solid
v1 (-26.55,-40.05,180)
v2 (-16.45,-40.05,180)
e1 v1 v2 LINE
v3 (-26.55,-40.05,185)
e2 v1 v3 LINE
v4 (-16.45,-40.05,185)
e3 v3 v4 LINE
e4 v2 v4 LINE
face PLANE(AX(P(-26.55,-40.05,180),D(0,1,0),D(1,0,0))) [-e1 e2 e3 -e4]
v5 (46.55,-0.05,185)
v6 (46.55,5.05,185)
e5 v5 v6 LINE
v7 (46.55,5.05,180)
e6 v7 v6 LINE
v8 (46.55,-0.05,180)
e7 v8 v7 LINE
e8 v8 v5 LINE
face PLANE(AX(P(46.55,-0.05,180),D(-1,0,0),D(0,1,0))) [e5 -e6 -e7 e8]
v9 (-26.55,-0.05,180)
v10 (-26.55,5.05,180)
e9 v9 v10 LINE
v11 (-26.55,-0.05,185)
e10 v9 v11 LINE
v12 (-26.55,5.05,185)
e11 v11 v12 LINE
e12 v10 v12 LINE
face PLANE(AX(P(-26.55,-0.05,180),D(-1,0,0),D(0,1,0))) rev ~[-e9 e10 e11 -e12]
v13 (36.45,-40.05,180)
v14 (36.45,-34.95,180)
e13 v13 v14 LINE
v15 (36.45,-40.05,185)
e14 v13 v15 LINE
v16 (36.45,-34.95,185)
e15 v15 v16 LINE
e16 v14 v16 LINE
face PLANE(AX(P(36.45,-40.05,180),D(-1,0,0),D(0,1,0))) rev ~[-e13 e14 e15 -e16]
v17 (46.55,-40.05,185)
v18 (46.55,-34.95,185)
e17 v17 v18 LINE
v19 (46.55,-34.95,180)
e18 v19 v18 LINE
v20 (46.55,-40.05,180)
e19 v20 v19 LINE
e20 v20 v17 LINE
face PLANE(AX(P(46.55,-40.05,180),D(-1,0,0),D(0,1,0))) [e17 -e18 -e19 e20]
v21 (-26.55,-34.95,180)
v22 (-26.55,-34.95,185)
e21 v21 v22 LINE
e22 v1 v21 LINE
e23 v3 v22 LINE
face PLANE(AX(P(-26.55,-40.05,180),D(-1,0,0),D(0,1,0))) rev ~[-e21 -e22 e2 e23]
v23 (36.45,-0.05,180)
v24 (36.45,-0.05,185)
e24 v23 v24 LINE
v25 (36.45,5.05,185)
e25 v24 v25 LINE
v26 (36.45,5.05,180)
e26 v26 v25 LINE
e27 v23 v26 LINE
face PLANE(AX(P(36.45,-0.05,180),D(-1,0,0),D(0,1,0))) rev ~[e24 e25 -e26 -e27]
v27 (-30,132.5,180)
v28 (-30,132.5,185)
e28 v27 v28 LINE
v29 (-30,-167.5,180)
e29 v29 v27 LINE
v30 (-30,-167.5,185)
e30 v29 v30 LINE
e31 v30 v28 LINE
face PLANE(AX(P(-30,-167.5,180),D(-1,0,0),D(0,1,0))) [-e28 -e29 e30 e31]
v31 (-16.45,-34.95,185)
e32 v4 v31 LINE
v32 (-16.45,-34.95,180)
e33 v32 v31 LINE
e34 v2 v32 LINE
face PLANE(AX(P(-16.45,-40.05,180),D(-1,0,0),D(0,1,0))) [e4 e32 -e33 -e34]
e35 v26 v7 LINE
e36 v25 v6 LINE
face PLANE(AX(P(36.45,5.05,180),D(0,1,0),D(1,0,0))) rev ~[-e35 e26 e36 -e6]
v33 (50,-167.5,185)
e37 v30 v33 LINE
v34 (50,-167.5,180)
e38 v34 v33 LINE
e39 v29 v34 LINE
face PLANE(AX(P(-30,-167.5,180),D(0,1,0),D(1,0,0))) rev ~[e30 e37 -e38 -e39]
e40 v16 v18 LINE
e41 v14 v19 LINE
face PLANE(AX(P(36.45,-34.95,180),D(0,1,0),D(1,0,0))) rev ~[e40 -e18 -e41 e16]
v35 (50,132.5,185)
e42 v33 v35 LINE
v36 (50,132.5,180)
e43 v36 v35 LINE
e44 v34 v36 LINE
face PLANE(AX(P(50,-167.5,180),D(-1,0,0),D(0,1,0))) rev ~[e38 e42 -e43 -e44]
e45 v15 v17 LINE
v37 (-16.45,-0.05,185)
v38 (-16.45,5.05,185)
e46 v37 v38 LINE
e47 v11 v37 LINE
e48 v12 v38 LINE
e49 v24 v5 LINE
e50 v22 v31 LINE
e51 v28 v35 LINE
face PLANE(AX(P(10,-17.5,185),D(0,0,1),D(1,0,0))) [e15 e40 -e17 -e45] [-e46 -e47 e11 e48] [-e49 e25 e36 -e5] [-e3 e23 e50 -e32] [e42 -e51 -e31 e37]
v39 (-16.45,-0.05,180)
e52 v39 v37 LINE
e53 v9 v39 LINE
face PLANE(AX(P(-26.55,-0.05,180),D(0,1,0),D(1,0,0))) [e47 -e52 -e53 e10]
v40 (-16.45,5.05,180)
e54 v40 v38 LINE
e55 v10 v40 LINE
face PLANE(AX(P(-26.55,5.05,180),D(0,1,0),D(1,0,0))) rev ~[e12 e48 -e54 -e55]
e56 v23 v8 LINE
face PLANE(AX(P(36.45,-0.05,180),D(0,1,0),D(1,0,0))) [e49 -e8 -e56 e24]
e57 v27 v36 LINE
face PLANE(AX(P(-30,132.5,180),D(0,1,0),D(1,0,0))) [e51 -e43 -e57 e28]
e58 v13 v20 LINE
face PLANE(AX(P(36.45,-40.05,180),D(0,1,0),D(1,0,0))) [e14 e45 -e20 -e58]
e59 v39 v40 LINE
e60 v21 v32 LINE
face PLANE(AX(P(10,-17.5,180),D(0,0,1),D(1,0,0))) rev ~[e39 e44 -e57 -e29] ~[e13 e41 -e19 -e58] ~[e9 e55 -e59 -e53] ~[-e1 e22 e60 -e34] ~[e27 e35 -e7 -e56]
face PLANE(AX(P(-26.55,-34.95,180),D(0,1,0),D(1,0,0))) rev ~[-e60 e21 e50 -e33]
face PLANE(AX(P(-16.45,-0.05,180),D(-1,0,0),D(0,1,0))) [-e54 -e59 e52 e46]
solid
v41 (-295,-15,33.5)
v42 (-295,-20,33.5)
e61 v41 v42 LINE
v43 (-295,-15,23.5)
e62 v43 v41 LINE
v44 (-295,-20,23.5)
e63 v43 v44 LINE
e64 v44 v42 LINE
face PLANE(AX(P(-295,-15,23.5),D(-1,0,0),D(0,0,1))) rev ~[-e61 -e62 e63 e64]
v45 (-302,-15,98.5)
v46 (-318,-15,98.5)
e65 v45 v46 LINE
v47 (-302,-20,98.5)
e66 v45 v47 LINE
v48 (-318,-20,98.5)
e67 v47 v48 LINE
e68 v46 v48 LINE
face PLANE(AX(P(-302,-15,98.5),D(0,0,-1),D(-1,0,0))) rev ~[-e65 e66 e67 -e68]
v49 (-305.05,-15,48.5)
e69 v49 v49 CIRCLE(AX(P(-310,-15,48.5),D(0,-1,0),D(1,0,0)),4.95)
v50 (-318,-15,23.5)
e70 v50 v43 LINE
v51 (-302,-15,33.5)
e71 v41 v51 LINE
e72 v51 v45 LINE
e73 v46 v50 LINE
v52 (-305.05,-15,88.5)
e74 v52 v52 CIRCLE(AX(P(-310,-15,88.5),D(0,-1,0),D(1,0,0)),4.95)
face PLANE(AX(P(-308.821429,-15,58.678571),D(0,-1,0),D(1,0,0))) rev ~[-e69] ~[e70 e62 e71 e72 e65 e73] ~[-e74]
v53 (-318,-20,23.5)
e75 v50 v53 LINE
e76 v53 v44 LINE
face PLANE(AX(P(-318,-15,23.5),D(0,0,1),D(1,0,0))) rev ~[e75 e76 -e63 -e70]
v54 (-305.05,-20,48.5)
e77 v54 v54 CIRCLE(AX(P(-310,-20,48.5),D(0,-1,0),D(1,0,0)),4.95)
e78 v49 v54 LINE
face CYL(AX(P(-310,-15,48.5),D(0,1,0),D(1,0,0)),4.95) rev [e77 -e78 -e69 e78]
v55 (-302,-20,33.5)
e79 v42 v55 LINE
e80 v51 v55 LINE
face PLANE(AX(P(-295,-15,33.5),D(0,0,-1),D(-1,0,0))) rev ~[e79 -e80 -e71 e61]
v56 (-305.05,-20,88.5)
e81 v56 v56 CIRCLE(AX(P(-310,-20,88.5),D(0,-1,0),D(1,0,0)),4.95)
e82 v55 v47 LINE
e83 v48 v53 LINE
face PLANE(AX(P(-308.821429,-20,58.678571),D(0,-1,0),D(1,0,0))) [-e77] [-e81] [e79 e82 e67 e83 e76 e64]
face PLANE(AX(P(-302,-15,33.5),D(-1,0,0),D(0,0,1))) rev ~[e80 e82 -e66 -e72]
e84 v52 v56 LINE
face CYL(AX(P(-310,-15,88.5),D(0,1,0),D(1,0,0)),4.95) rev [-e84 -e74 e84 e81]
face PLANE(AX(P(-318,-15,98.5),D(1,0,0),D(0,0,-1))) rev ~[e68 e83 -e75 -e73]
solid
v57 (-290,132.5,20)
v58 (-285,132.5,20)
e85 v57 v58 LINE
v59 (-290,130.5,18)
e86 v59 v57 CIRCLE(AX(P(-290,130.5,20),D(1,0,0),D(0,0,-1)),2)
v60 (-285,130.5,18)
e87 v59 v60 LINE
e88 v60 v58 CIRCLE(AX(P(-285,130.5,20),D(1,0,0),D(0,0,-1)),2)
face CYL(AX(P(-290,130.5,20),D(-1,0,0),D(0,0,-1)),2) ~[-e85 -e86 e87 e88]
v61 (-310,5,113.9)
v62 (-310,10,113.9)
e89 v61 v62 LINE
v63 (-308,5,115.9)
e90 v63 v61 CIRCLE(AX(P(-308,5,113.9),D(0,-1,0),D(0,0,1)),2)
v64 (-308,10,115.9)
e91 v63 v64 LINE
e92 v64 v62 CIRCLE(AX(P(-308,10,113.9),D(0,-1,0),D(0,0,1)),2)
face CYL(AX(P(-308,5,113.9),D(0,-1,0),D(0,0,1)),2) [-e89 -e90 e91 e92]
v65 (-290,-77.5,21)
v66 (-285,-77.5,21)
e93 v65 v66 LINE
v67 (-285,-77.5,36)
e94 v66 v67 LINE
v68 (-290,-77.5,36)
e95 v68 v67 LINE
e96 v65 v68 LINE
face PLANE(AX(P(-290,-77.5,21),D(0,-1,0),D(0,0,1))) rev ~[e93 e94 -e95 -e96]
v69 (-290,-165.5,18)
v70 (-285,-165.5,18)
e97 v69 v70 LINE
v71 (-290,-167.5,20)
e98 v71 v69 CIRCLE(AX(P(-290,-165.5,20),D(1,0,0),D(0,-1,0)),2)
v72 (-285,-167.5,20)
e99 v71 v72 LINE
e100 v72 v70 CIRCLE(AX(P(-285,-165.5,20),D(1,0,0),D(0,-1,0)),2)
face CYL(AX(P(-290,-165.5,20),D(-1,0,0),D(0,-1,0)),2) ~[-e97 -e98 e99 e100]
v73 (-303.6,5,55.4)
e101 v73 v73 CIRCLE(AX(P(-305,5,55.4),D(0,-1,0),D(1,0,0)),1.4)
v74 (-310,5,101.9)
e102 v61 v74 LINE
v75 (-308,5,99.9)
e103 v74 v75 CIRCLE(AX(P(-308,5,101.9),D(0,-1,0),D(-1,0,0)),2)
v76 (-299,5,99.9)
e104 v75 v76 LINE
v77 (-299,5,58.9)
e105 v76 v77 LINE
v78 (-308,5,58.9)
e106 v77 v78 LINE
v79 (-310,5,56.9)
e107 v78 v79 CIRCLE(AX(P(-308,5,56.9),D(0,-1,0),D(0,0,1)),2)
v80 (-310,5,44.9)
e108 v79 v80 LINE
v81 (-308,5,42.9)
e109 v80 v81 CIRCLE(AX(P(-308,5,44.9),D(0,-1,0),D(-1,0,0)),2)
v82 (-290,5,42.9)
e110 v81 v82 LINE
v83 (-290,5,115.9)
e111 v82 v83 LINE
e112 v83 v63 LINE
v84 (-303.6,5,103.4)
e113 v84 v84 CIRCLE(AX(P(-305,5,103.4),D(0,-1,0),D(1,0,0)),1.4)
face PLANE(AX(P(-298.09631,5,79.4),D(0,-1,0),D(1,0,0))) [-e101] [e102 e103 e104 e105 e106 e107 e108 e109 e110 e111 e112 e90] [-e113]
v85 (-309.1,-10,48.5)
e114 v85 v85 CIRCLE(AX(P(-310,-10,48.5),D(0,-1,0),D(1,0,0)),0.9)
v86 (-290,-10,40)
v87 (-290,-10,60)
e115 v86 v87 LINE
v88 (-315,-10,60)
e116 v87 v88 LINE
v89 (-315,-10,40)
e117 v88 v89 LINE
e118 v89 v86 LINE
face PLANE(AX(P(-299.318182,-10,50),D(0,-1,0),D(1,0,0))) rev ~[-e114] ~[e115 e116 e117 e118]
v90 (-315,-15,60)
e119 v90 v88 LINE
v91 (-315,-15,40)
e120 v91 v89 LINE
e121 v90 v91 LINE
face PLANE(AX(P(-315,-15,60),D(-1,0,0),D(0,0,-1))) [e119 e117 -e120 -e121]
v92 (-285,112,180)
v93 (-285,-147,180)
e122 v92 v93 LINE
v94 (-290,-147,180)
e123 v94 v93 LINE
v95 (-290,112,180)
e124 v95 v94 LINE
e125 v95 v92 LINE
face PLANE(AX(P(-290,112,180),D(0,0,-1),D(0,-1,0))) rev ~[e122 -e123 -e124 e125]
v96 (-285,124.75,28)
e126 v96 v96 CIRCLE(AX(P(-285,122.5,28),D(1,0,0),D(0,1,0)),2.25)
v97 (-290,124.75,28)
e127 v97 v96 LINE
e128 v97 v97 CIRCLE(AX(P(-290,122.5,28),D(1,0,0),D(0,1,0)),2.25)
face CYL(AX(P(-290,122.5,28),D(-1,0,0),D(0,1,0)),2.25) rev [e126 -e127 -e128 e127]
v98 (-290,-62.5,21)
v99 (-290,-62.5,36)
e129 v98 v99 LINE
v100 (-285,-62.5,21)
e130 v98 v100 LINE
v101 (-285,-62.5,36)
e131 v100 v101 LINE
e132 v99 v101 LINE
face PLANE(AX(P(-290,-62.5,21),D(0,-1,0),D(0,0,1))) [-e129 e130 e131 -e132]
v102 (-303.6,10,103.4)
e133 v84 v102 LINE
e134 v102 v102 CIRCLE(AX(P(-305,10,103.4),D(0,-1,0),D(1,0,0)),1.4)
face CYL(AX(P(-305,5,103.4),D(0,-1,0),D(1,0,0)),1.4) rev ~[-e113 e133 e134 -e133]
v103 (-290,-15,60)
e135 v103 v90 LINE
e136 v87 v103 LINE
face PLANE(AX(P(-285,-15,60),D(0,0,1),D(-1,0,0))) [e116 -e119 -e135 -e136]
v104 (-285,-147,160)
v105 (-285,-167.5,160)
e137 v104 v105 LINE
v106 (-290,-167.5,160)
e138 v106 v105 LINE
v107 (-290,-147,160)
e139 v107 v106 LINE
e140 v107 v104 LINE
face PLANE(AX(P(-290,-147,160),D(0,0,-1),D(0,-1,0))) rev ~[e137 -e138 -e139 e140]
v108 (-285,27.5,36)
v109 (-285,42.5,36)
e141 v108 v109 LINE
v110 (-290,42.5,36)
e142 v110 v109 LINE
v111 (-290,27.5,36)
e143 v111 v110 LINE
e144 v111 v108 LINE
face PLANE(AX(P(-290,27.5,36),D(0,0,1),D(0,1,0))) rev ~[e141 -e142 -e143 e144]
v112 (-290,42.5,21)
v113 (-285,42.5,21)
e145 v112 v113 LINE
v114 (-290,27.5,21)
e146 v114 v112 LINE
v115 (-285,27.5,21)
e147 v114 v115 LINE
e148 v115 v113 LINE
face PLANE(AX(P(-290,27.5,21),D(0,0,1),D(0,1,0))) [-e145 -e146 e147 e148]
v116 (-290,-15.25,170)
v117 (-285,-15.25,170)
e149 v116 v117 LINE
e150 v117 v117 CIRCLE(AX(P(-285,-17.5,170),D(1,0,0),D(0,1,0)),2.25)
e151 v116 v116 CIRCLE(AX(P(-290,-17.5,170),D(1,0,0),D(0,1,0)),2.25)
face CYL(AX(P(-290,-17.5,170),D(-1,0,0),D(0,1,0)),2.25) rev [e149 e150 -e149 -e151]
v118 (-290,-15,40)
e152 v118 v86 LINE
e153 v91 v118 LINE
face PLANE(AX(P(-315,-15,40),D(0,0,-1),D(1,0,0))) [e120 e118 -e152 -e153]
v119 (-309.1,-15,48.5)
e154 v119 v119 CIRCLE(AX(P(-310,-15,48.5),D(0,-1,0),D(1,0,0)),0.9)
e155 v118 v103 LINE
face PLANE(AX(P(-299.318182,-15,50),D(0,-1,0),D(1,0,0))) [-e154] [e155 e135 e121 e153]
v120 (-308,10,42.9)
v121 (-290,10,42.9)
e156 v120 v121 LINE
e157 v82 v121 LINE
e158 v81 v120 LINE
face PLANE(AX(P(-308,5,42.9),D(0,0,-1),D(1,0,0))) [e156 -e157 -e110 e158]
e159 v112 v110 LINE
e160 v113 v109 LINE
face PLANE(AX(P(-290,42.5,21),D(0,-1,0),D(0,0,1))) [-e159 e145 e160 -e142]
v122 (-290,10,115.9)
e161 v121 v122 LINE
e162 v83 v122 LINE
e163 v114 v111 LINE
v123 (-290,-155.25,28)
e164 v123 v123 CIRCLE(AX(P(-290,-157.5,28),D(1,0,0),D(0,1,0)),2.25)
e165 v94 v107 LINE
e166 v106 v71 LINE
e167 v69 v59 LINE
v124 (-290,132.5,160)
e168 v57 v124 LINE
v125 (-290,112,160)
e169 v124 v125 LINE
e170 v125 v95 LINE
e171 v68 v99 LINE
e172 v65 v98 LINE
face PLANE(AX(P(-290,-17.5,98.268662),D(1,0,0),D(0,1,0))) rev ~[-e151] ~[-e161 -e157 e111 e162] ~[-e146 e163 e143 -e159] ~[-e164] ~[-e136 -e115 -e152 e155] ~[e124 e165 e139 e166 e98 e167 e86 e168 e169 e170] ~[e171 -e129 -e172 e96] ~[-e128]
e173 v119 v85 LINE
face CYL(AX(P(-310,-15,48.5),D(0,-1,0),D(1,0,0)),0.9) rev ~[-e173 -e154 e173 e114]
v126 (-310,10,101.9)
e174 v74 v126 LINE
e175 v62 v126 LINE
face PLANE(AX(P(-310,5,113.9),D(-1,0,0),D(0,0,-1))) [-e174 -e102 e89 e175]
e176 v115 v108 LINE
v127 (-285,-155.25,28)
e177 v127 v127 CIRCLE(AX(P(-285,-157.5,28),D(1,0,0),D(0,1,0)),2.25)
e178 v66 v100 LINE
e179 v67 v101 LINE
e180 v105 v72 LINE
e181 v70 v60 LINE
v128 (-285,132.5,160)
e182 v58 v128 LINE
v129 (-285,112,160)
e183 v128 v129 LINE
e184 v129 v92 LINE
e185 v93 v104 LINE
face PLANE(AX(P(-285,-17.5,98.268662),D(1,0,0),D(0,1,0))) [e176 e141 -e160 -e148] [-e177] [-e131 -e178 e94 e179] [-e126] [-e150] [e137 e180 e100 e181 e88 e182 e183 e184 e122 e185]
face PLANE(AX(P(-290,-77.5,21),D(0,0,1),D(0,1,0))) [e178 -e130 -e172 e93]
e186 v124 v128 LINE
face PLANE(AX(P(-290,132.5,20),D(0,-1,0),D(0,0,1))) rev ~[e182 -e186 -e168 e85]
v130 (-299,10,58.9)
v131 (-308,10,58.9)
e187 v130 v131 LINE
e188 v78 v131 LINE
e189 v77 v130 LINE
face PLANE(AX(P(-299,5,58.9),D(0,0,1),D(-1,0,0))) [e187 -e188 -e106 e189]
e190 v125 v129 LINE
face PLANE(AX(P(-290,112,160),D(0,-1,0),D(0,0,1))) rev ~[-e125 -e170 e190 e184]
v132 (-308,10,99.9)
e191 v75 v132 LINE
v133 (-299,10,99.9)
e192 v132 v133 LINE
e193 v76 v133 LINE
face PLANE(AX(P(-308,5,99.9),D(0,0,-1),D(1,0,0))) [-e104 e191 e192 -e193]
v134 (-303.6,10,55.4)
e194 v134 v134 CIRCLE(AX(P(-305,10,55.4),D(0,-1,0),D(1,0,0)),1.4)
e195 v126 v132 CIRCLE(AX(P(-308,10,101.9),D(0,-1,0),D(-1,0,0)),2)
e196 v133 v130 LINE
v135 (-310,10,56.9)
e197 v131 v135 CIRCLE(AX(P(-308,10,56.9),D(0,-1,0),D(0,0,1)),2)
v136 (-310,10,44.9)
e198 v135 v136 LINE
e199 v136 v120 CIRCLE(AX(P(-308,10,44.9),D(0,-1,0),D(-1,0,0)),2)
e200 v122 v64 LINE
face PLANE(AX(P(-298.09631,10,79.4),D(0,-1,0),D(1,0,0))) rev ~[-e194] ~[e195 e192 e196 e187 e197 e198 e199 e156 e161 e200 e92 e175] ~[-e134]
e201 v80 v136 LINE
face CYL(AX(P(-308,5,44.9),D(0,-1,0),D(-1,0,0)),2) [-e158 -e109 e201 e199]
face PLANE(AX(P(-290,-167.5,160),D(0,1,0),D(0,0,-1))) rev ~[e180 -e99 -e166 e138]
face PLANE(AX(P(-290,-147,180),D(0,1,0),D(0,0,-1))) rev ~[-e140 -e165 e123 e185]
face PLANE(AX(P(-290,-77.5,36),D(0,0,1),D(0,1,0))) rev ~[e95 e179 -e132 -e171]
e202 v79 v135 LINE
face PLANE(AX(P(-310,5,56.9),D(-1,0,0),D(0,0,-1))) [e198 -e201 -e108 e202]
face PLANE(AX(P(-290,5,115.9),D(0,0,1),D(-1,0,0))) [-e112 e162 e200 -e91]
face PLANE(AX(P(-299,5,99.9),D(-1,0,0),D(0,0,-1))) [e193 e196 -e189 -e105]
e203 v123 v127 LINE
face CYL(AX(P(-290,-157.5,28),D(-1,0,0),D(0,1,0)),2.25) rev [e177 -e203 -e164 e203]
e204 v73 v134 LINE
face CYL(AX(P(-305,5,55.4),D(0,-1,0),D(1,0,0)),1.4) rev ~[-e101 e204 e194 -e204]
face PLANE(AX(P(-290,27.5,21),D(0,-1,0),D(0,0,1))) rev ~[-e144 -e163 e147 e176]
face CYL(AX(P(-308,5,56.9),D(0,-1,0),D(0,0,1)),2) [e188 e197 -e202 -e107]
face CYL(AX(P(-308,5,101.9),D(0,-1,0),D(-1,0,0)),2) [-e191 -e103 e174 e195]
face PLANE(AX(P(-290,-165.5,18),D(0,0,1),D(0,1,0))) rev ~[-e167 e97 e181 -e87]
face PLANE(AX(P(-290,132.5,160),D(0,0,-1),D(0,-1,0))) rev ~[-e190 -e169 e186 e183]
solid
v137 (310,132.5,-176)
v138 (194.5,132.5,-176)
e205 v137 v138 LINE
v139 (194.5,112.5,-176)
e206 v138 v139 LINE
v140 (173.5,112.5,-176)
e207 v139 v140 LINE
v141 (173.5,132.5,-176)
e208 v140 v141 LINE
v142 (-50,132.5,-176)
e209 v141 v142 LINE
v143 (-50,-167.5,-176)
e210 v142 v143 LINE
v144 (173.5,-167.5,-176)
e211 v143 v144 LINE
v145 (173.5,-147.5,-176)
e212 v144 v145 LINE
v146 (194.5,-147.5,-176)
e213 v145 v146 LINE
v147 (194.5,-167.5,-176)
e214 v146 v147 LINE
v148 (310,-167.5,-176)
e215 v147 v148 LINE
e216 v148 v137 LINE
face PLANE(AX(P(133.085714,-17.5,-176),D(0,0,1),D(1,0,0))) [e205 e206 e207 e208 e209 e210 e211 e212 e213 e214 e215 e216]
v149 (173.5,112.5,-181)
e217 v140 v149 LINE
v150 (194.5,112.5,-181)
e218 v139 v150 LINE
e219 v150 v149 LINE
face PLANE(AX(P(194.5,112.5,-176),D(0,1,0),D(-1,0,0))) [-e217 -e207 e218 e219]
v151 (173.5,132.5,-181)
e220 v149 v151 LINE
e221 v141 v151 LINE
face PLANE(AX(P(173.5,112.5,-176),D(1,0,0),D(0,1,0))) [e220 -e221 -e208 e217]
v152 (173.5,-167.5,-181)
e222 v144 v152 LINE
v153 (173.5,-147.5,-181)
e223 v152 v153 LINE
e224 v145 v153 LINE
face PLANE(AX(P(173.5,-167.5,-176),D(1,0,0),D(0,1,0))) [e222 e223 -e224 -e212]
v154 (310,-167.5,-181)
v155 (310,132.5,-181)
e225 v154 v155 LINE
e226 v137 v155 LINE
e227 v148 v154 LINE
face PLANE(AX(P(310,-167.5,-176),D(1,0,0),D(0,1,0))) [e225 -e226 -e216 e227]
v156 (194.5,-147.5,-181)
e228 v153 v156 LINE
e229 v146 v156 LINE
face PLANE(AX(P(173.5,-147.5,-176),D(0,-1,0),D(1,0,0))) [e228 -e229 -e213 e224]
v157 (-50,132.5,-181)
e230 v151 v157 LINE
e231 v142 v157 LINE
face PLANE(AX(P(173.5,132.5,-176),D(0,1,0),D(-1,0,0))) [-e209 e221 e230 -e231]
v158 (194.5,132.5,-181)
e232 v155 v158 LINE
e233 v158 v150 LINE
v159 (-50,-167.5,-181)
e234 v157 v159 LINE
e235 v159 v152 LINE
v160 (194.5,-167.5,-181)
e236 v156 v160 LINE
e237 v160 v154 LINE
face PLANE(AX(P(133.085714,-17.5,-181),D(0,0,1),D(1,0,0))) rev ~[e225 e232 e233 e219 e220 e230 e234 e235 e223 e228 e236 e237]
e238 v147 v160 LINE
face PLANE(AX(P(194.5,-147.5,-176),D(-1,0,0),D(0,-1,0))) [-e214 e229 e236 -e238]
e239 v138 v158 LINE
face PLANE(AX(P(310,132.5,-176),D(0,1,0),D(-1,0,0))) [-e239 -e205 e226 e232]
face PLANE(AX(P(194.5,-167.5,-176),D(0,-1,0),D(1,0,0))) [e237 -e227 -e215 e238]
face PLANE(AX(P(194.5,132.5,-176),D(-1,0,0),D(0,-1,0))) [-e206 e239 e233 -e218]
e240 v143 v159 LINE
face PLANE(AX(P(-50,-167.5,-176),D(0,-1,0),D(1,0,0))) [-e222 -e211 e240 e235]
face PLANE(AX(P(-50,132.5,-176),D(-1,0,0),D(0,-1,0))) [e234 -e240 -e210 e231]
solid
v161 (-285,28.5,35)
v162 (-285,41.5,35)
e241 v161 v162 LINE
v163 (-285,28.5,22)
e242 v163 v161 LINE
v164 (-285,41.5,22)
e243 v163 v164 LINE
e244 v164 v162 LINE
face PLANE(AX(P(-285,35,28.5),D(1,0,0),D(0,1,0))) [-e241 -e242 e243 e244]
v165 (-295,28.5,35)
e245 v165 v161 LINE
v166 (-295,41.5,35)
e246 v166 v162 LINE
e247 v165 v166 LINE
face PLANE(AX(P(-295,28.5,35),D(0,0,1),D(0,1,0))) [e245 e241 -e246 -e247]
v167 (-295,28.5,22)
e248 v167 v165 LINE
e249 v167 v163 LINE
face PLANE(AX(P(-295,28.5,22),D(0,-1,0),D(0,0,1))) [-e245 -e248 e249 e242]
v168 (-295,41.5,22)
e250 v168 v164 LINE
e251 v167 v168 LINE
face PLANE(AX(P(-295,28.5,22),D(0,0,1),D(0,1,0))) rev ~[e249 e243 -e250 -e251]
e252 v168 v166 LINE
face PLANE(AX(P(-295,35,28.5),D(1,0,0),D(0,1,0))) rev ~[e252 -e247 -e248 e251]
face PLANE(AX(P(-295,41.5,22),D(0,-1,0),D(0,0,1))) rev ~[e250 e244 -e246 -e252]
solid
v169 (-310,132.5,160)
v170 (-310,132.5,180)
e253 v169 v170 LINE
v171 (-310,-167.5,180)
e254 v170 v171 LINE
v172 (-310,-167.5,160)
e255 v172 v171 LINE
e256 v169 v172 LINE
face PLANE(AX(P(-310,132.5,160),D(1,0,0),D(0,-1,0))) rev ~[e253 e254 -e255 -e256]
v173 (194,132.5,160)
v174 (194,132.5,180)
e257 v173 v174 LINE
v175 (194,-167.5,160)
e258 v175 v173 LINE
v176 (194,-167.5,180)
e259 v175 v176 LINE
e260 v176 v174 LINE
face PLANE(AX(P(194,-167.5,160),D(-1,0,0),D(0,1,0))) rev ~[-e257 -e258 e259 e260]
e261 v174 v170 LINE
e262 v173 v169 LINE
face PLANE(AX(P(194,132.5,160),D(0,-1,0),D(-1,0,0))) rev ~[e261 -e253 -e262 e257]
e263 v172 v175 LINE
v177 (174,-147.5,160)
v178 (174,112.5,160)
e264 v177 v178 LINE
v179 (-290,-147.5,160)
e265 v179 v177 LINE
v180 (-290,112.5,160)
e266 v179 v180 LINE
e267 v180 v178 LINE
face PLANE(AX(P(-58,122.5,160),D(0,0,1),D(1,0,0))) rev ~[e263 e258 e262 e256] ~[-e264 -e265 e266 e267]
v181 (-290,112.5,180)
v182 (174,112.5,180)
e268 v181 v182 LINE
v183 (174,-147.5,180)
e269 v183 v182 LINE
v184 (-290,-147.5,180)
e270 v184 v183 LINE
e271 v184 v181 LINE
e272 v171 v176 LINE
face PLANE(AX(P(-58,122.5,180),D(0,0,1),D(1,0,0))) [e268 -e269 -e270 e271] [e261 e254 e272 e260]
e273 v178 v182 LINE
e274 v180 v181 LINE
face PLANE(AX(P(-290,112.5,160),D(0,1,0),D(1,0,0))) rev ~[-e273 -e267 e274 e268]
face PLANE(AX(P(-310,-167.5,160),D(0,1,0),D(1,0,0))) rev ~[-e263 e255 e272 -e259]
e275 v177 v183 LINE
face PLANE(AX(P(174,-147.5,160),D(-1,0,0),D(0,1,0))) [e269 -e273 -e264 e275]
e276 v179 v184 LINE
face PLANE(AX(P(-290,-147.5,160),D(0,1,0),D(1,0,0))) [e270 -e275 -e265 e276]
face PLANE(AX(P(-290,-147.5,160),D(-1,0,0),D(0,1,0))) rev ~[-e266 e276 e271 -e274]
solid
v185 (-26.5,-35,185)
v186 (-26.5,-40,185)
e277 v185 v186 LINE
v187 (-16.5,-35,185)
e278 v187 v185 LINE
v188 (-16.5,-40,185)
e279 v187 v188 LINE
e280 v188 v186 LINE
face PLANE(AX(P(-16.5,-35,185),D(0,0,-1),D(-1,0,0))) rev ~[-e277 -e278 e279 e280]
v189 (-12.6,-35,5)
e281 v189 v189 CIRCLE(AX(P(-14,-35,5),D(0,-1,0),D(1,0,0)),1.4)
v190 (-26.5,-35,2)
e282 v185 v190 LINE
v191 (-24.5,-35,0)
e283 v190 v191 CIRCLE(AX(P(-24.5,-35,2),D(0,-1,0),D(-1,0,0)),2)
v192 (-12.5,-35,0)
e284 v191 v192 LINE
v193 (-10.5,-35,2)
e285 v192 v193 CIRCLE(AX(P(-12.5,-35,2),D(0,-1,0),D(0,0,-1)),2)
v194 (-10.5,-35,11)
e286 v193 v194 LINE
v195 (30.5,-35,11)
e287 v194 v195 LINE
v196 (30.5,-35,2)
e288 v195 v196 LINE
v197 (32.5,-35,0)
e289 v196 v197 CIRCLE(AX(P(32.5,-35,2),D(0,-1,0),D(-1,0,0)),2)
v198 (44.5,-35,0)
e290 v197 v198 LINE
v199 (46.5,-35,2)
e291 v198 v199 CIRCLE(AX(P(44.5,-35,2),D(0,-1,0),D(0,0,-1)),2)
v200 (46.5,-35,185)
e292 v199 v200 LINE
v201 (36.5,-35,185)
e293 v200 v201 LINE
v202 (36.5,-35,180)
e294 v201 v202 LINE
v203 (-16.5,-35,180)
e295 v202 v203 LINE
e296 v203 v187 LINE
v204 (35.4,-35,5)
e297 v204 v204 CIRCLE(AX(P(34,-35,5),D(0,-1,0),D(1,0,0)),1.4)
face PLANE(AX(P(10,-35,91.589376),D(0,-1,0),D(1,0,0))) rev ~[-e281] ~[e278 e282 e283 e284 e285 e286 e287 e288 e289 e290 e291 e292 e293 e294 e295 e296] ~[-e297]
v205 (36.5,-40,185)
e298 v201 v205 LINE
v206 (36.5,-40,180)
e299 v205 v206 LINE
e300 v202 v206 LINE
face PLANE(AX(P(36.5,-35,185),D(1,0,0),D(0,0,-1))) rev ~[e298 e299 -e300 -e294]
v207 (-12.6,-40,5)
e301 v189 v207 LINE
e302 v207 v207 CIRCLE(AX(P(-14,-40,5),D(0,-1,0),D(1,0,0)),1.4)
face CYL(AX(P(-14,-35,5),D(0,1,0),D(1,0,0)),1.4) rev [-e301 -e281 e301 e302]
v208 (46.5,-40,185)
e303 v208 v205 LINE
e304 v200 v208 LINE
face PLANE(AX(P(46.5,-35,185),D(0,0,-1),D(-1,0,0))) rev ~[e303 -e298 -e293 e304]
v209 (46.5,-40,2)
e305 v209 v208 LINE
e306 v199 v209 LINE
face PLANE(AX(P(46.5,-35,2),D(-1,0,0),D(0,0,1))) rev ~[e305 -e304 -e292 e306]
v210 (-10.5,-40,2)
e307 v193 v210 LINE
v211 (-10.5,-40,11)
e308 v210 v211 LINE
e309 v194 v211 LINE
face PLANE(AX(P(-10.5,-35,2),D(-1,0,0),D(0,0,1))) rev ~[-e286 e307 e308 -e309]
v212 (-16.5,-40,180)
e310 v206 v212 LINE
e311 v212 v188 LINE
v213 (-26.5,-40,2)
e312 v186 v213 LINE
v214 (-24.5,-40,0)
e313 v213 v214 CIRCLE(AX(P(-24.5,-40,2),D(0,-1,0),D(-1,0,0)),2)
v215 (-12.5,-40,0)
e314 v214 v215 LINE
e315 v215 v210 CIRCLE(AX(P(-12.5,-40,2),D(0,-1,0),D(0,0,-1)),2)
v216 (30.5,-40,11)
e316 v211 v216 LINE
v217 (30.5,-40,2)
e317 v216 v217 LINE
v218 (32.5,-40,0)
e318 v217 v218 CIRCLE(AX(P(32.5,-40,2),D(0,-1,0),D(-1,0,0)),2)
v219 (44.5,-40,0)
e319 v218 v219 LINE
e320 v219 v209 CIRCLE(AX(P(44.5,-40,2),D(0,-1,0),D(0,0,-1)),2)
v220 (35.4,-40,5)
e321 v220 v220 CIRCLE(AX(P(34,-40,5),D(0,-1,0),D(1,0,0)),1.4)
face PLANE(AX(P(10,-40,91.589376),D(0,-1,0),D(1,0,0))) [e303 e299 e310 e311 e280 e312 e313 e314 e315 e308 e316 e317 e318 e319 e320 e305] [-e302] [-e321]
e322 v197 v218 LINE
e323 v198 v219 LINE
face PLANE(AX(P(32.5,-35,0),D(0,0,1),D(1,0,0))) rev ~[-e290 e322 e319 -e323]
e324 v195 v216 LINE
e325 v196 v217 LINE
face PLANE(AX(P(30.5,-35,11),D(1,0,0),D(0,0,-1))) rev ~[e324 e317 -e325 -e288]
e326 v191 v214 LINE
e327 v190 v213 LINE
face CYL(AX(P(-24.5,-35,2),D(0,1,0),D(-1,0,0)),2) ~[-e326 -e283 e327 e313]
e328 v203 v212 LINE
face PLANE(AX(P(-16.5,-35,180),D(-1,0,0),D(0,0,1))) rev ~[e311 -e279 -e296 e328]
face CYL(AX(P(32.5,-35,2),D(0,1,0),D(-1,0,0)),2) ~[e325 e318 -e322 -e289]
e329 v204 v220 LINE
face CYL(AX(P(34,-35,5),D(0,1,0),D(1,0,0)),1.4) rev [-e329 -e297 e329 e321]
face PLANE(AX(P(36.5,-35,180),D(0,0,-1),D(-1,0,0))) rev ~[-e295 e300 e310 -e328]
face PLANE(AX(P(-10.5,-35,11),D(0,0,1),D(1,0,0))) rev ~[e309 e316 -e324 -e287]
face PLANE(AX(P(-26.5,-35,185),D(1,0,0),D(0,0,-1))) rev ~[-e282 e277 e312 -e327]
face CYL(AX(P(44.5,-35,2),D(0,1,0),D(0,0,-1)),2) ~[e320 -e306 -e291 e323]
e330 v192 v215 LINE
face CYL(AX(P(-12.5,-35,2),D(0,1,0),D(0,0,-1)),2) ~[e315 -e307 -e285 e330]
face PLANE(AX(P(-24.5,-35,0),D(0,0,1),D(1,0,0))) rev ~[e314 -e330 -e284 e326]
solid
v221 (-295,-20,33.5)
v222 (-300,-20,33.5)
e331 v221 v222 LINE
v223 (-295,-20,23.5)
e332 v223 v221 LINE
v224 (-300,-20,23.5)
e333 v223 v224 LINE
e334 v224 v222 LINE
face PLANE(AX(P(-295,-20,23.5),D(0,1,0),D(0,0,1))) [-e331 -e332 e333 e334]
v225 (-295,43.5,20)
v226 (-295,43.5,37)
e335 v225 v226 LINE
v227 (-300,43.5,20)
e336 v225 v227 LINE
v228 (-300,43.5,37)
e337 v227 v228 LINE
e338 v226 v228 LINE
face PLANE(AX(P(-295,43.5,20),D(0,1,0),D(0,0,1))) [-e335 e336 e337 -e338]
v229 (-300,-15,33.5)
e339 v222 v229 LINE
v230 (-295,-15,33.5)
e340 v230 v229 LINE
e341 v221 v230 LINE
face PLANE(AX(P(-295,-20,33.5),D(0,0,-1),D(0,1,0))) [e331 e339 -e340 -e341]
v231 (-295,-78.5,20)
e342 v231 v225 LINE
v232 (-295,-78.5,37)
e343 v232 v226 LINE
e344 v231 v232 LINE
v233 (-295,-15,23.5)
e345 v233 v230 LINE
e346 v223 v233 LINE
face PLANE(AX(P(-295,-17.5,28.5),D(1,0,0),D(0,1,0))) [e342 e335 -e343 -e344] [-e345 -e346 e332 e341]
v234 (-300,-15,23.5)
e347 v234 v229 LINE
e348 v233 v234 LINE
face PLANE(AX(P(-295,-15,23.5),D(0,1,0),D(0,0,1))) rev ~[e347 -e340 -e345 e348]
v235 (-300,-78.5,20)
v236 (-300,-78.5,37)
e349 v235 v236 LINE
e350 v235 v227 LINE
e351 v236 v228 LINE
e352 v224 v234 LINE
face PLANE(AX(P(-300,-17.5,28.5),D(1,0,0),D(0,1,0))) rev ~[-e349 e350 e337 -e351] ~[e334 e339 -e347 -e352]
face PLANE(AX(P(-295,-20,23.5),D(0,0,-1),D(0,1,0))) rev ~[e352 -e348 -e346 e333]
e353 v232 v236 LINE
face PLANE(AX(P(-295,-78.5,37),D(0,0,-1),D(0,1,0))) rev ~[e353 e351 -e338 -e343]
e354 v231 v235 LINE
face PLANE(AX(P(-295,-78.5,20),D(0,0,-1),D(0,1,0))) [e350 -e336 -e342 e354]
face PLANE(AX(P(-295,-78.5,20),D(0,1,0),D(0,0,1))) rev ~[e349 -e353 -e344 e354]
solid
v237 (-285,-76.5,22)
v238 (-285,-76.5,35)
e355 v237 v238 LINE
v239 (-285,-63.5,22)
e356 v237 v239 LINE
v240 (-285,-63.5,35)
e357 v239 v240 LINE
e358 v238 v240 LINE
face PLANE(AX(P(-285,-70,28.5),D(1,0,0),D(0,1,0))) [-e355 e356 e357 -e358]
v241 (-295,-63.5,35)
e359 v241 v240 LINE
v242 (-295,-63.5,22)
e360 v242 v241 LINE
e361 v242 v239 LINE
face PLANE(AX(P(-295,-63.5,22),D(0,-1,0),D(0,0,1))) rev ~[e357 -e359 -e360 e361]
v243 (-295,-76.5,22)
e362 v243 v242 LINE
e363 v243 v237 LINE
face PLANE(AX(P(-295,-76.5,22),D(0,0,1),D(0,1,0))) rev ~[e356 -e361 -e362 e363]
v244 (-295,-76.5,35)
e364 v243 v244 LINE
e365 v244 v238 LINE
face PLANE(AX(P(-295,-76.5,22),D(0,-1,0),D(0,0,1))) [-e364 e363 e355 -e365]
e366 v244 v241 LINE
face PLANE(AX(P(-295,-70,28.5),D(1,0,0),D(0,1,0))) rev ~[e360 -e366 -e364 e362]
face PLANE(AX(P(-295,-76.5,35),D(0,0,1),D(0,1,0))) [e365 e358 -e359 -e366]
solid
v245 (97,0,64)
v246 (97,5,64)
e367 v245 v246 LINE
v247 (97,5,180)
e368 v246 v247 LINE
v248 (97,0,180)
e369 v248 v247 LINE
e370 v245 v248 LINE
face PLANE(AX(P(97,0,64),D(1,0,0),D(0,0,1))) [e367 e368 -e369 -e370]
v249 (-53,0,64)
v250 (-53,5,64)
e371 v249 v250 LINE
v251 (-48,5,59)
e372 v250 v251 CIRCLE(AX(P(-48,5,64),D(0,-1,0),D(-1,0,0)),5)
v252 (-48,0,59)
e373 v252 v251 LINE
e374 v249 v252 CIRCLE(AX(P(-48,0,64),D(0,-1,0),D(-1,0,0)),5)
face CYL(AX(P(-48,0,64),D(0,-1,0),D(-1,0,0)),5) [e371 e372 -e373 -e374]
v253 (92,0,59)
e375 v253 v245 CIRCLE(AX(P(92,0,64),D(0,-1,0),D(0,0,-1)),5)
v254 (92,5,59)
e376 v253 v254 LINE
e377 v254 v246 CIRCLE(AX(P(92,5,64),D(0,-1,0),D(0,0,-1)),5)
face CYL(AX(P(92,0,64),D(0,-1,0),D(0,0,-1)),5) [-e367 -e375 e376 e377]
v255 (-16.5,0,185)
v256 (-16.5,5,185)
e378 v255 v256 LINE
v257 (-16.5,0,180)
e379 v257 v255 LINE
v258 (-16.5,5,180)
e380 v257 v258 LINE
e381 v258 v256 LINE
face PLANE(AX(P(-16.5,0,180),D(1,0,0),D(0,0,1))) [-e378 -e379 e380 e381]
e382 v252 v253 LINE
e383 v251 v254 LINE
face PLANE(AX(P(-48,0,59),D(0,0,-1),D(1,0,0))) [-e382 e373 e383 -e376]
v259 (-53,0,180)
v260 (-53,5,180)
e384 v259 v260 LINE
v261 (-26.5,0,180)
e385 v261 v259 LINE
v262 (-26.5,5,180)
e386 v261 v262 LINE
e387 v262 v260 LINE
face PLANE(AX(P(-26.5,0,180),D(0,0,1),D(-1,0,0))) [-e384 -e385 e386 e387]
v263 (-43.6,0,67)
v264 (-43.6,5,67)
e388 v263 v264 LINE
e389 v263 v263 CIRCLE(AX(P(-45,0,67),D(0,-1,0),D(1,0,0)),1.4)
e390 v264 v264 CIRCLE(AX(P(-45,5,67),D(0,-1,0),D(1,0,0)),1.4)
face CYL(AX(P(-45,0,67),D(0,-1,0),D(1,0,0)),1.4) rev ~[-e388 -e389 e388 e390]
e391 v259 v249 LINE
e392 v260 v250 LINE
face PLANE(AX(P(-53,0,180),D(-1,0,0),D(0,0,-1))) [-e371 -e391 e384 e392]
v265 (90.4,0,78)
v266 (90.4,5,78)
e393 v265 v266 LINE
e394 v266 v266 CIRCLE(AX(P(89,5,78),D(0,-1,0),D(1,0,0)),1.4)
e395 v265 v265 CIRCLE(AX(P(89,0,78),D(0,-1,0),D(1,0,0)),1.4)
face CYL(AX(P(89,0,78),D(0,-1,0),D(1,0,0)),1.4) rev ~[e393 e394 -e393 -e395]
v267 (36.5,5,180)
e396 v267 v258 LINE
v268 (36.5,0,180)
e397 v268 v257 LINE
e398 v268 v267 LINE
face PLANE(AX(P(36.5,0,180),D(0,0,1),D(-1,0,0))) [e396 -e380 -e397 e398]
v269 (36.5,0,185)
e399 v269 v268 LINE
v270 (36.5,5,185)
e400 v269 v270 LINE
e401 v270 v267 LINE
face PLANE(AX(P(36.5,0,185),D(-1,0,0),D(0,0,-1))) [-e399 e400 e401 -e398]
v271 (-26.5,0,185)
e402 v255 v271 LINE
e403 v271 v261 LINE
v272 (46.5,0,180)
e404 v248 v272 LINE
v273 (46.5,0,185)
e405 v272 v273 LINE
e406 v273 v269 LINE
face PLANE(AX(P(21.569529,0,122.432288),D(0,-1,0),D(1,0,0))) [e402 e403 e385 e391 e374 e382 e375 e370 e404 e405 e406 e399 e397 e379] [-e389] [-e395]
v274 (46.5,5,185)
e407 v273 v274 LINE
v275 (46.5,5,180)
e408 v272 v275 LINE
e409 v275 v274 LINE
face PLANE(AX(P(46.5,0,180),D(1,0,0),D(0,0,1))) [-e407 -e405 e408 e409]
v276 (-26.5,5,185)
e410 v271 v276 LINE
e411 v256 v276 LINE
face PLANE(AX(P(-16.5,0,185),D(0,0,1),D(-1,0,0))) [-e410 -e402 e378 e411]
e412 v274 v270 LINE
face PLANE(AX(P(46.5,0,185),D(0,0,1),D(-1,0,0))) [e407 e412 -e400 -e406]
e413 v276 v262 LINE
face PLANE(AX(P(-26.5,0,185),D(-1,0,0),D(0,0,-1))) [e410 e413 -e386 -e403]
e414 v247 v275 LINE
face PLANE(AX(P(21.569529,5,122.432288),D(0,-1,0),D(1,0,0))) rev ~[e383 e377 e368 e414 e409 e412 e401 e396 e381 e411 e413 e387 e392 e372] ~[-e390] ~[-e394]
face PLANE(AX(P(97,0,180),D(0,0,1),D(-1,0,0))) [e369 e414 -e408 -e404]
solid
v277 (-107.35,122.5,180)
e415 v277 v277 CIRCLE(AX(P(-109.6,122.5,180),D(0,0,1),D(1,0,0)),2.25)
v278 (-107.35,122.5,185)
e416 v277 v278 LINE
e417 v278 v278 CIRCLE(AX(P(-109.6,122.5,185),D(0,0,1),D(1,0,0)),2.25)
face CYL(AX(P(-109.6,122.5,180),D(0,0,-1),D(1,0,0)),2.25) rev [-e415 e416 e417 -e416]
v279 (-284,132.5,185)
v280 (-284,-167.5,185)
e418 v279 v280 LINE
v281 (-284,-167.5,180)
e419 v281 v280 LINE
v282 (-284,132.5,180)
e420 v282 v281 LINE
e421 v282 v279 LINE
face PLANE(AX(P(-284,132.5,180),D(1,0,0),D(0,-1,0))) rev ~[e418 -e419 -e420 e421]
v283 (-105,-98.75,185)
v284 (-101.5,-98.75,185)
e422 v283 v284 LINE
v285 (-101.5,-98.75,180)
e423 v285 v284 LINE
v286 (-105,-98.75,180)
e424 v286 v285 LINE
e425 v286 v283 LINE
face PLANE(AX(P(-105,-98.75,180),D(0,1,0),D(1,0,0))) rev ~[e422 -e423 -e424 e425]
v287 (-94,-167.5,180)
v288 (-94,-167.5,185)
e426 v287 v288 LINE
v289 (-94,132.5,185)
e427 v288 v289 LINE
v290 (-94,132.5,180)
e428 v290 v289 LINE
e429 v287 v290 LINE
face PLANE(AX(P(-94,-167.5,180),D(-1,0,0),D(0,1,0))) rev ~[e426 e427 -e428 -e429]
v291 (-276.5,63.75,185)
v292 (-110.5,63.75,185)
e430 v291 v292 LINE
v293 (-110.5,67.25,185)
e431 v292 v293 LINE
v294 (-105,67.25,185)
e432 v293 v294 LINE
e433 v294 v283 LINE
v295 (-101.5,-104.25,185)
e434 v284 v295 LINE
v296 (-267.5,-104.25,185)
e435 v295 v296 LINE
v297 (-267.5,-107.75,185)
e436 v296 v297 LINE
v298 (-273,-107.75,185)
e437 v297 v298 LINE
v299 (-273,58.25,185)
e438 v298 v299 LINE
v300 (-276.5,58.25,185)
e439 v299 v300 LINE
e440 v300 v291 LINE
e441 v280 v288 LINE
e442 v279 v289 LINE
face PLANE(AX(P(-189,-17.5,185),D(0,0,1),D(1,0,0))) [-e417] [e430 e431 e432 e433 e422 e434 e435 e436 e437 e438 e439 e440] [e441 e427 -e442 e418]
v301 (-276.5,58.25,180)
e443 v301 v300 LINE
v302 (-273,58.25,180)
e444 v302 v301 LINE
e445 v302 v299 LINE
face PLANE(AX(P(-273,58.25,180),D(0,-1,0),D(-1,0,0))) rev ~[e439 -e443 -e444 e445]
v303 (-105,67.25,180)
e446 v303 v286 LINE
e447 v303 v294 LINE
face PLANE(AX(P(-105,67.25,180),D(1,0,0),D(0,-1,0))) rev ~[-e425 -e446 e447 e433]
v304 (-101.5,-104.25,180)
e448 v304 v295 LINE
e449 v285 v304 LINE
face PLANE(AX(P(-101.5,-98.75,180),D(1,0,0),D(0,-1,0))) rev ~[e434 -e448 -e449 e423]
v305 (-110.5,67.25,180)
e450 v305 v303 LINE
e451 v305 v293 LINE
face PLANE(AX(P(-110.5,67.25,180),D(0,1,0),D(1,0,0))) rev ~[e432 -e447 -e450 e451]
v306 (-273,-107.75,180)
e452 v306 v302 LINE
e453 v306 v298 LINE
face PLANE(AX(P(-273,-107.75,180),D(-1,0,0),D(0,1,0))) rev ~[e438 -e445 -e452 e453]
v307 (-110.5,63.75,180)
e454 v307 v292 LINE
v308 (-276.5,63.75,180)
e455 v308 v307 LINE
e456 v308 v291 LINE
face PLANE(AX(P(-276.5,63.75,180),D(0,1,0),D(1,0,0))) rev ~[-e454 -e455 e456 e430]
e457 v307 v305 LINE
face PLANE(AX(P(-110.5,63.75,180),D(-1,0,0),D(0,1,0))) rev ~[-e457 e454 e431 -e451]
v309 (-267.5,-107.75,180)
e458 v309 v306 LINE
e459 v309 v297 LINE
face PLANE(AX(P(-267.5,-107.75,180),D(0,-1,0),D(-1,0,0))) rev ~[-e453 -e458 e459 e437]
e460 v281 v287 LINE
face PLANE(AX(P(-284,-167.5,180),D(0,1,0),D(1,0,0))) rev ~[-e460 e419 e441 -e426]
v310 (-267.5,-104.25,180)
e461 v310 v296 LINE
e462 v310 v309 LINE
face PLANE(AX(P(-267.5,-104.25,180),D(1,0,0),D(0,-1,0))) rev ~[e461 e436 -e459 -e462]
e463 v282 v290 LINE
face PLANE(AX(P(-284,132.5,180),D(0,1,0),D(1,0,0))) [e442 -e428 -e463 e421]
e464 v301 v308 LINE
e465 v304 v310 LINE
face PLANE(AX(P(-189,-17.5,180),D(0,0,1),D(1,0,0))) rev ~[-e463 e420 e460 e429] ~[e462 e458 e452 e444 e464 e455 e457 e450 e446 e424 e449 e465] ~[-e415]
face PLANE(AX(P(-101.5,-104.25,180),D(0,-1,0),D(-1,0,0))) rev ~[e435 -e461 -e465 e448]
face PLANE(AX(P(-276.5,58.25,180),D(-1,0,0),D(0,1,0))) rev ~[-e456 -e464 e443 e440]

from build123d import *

# Parameters (mm, degrees)
F2_R      = 1.4
F3_DEPTH  = 5
F0_R      = 1.4
F4_DEPTH  = 5
F9_W      = 464
F9_H      = 20
F9_W_2    = 20
F9_H_2    = 260
F10_DEPTH = 20
F11_DEPTH = 5
F16_W     = 190
F16_H     = 260
F16_H_2   = 20
F16_R     = 2.25
F17_DEPTH = 5
F18_W     = 80
F18_H     = 300
F18_W_2   = 10.1
F18_H_2   = 5.1
F19_DEPTH = 5
F15_R     = 2.25
F15_W     = 15
F15_H     = 15
F22_DEPTH = 5
F21_W     = 13
F21_H     = 13
F23_DEPTH = 10
F24_W     = 122
F24_H     = 17
F24_W_2   = 5
F24_H_2   = 10
F25_DEPTH = 5
F27_R     = 0.9
F28_DEPTH = 5
F30_R     = 1.4
F31_DEPTH = 5
F32_R     = 4.95
F33_DEPTH = 5


# Not quite as in the source:
# - a feature of the source that left no trace in its solid (it failed there, or was rolled back) is left out
# - a feature names something its author has since deleted; it is built from what else it names


with BuildPart() as f3:
    # F2 (on offset) → F3 (new body)
    with BuildSketch(Plane.XZ.offset(35)):
        with BuildLine():
            ThreePointArc((-26.5, 2), (-25.9142135624, 0.5857864376), (-24.5, 0))
            Line((-24.5, 0), (-12.5, 0))
            ThreePointArc((-12.5, 0), (-11.0857864376, 0.5857864376), (-10.5, 2))
            Line((-10.5, 2), (-10.5, 11))
            Line((-10.5, 11), (30.5, 11))
            Line((30.5, 11), (30.5, 2))
            ThreePointArc((30.5, 2), (31.0857864376, 0.5857864376), (32.5, 0))
            Line((32.5, 0), (44.5, 0))
            ThreePointArc((44.5, 0), (45.9142135624, 0.5857864376), (46.5, 2))
            Line((46.5, 2), (46.5, 100))
            Line((46.5, 100), (46.5, 185))
            Line((46.5, 185), (36.5, 185))
            Line((36.5, 185), (36.5, 180))
            Line((36.5, 180), (-16.5, 180))
            Line((-16.5, 180), (-16.5, 185))
            Line((-16.5, 185), (-26.5, 185))
            Line((-26.5, 185), (-26.5, 180))
            Line((-26.5, 180), (-26.5, 2))
        make_face()
        with Locations((-14, 5)):
            Circle(F2_R, mode=Mode.SUBTRACT)
        with Locations((34, 5)):
            Circle(F2_R, mode=Mode.SUBTRACT)
    extrude(amount=F3_DEPTH)


with BuildPart() as f4:
    # F0 (on Front) → F4 (new body)
    with BuildSketch(Plane.XZ):
        with BuildLine():
            Line((-53, 180), (-53, 64))
            ThreePointArc((-53, 64), (-51.5355339059, 60.4644660941), (-48, 59))
            Line((-48, 59), (92, 59))
            ThreePointArc((92, 59), (95.5355339059, 60.4644660941), (97, 64))
            Line((97, 64), (97, 180))
            Line((97, 180), (46.5, 180))
            Line((46.5, 180), (46.5, 185))
            Line((46.5, 185), (36.5, 185))
            Line((36.5, 185), (36.5, 180))
            Line((36.5, 180), (-16.5, 180))
            Line((-16.5, 180), (-16.5, 185))
            Line((-16.5, 185), (-26.5, 185))
            Line((-26.5, 185), (-26.5, 180))
            Line((-26.5, 180), (-53, 180))
        make_face()
        with Locations((-45, 67)):
            Circle(F0_R, mode=Mode.SUBTRACT)
        with Locations((89, 78)):
            Circle(F0_R, mode=Mode.SUBTRACT)
    extrude(amount=-F4_DEPTH)


with BuildPart() as f10:
    # F9 (on offset) → F10 (new body)
    with BuildSketch(Plane.XY.offset(160)):
        with Locations((-58, 122.5)):
            Rectangle(F9_W, F9_H)
        with Locations((-300, -17.5)):
            Rectangle(F9_W_2, F9_H_2)
        with Locations((-300, 122.5)):
            Rectangle(F9_W_2, F9_H)
        with Locations((184, -17.5)):
            Rectangle(F9_W_2, F9_H_2)
        with Locations((184, 122.5)):
            Rectangle(F9_W_2, F9_H)
        with Locations((-300, -157.5)):
            Rectangle(F9_W_2, F9_H)
        with Locations((-58, -157.5)):
            Rectangle(F9_W, F9_H)
        with Locations((184, -157.5)):
            Rectangle(F9_W_2, F9_H)
    extrude(amount=F10_DEPTH)


with BuildPart() as f11:
    # F7 (on offset) → F11 (new body)
    with BuildSketch(Plane.XY.offset(-176)):
        Polygon((173.5, 112.5), (173.5, 132.5), (-50, 132.5), (-50, -167.5), (173.5, -167.5), (173.5, -147.5), (194.5, -147.5), (194.5, -167.5), (310, -167.5), (310, 132.5), (194.5, 132.5), (194.5, 112.5), align=None)
    extrude(amount=-F11_DEPTH)


with BuildPart() as f17:
    # F16 (on face) → F17 (new body)
    with BuildSketch(Plane.XY.offset(180)):
        with Locations((-189, -17.5)):
            Rectangle(F16_W, F16_H)
        Polygon((-273, -107.75), (-273, -104.25), (-273, 58.25), (-276.5, 58.25), (-276.5, 63.75), (-273, 63.75), (-110.5, 63.75), (-110.5, 67.25), (-105, 67.25), (-105, 63.75), (-105, -98.75), (-101.5, -98.75), (-101.5, -104.25), (-105, -104.25), (-267.5, -104.25), (-267.5, -107.75), align=None, mode=Mode.SUBTRACT)
        with Locations((-189, -157.5)):
            Rectangle(F16_W, F16_H_2)
        with Locations((-189, 122.5)):
            Rectangle(F16_W, F16_H_2)
        with Locations((-109.6, 122.5)):
            Circle(F16_R, mode=Mode.SUBTRACT)
    extrude(amount=F17_DEPTH)


with BuildPart() as f19:
    # F18 (on face) → F19 (new body)
    with BuildSketch(Plane.XY.offset(180)):
        with Locations((10, -17.5)):
            Rectangle(F18_W, F18_H)
        with Locations((-21.5, -37.5)):
            Rectangle(F18_W_2, F18_H_2, mode=Mode.SUBTRACT)
        with Locations((41.5, -37.5)):
            Rectangle(F18_W_2, F18_H_2, mode=Mode.SUBTRACT)
        with Locations((-21.5, 2.5)):
            Rectangle(F18_W_2, F18_H_2, mode=Mode.SUBTRACT)
        with Locations((41.5, 2.5)):
            Rectangle(F18_W_2, F18_H_2, mode=Mode.SUBTRACT)
    extrude(amount=F19_DEPTH)


with BuildPart() as f22:
    # F15 (on face) → F22 (new body)
    with BuildSketch(Plane.YZ.offset(-290)):
        with BuildLine():
            ThreePointArc((-167.5, 20), (-166.9142135624, 18.5857864376), (-165.5, 18))
            Line((-165.5, 18), (130.5, 18))
            ThreePointArc((130.5, 18), (131.9142135624, 18.5857864376), (132.5, 20))
            Line((132.5, 20), (132.5, 160))
            Line((132.5, 160), (112, 160))
            Line((112, 160), (112, 180))
            Line((112, 180), (-147, 180))
            Line((-147, 180), (-147, 160))
            Line((-147, 160), (-167.5, 160))
            Line((-167.5, 160), (-167.5, 20))
        make_face()
        with Locations((-157.5, 28)):
            Circle(F15_R, mode=Mode.SUBTRACT)
        with Locations((-70, 28.5)):
            Rectangle(F15_W, F15_H, mode=Mode.SUBTRACT)
        with Locations((35, 28.5)):
            Rectangle(F15_W, F15_H, mode=Mode.SUBTRACT)
        with Locations((122.5, 28)):
            Circle(F15_R, mode=Mode.SUBTRACT)
        with Locations((-17.5, 170)):
            Circle(F15_R, mode=Mode.SUBTRACT)
    extrude(amount=F22_DEPTH)

    # F27 (on offset) → F28 (join)
    with BuildSketch(Plane.XZ.offset(15)):
        Polygon((-315, 40), (-290, 40), (-285, 40), (-285, 45), (-290, 45), (-290, 55), (-285, 55), (-285, 60), (-290, 60), (-315, 60), align=None)
        with Locations((-310, 48.5)):
            Circle(F27_R, mode=Mode.SUBTRACT)
    extrude(amount=-F28_DEPTH)

    # F30 (on offset) → F31 (join)
    with BuildSketch(Plane.XZ.offset(-5)):
        with BuildLine():
            ThreePointArc((-308, 115.9), (-309.4142135624, 115.3142135624), (-310, 113.9))
            Line((-310, 113.9), (-310, 101.9))
            ThreePointArc((-310, 101.9), (-309.4142135624, 100.4857864376), (-308, 99.9))
            Line((-308, 99.9), (-299, 99.9))
            Line((-299, 99.9), (-299, 58.9))
            Line((-299, 58.9), (-308, 58.9))
            ThreePointArc((-308, 58.9), (-309.4142135624, 58.3142135624), (-310, 56.9))
            Line((-310, 56.9), (-310, 44.9))
            ThreePointArc((-310, 44.9), (-309.4142135624, 43.4857864376), (-308, 42.9))
            Line((-308, 42.9), (-290, 42.9))
            Line((-290, 42.9), (-290, 115.9))
            Line((-290, 115.9), (-308, 115.9))
        make_face()
        with Locations((-305, 55.4)):
            Circle(F30_R, mode=Mode.SUBTRACT)
        with Locations((-305, 103.4)):
            Circle(F30_R, mode=Mode.SUBTRACT)
    extrude(amount=-F31_DEPTH)


with BuildPart() as f23:
    # F21 (on offset) → F23 (new body)
    with BuildSketch(Plane.YZ.offset(-295)):
        with Locations((35, 28.5)):
            Rectangle(F21_W, F21_H)
    extrude(amount=F23_DEPTH)


with BuildPart() as f23b:
    # F21 (on offset) → F23, piece 2 (new body)
    with BuildSketch(Plane.YZ.offset(-295)):
        with Locations((-70, 28.5)):
            Rectangle(F21_W, F21_H)
    extrude(amount=F23_DEPTH)


with BuildPart() as f25:
    # F24 (on offset) → F25 (new body)
    with BuildSketch(Plane.YZ.offset(-295)):
        with Locations((-17.5, 28.5)):
            Rectangle(F24_W, F24_H)
        with Locations((-17.5, 28.5)):
            Rectangle(F24_W_2, F24_H_2, mode=Mode.SUBTRACT)
    extrude(amount=-F25_DEPTH)


with BuildPart() as f33:
    # F32 (on offset) → F33 (new body)
    with BuildSketch(Plane.XZ.offset(15)):
        Polygon((-318, 23.5), (-295, 23.5), (-295, 33.5), (-302, 33.5), (-302, 98.5), (-318, 98.5), align=None)
        with Locations((-310, 48.5)):
            Circle(F32_R, mode=Mode.SUBTRACT)
        with Locations((-310, 88.5)):
            Circle(F32_R, mode=Mode.SUBTRACT)
    extrude(amount=F33_DEPTH)


solid = Compound([f3.part, f4.part, f10.part, f11.part, f17.part, f19.part, f22.part, f23.part, f23b.part, f25.part, f33.part])
